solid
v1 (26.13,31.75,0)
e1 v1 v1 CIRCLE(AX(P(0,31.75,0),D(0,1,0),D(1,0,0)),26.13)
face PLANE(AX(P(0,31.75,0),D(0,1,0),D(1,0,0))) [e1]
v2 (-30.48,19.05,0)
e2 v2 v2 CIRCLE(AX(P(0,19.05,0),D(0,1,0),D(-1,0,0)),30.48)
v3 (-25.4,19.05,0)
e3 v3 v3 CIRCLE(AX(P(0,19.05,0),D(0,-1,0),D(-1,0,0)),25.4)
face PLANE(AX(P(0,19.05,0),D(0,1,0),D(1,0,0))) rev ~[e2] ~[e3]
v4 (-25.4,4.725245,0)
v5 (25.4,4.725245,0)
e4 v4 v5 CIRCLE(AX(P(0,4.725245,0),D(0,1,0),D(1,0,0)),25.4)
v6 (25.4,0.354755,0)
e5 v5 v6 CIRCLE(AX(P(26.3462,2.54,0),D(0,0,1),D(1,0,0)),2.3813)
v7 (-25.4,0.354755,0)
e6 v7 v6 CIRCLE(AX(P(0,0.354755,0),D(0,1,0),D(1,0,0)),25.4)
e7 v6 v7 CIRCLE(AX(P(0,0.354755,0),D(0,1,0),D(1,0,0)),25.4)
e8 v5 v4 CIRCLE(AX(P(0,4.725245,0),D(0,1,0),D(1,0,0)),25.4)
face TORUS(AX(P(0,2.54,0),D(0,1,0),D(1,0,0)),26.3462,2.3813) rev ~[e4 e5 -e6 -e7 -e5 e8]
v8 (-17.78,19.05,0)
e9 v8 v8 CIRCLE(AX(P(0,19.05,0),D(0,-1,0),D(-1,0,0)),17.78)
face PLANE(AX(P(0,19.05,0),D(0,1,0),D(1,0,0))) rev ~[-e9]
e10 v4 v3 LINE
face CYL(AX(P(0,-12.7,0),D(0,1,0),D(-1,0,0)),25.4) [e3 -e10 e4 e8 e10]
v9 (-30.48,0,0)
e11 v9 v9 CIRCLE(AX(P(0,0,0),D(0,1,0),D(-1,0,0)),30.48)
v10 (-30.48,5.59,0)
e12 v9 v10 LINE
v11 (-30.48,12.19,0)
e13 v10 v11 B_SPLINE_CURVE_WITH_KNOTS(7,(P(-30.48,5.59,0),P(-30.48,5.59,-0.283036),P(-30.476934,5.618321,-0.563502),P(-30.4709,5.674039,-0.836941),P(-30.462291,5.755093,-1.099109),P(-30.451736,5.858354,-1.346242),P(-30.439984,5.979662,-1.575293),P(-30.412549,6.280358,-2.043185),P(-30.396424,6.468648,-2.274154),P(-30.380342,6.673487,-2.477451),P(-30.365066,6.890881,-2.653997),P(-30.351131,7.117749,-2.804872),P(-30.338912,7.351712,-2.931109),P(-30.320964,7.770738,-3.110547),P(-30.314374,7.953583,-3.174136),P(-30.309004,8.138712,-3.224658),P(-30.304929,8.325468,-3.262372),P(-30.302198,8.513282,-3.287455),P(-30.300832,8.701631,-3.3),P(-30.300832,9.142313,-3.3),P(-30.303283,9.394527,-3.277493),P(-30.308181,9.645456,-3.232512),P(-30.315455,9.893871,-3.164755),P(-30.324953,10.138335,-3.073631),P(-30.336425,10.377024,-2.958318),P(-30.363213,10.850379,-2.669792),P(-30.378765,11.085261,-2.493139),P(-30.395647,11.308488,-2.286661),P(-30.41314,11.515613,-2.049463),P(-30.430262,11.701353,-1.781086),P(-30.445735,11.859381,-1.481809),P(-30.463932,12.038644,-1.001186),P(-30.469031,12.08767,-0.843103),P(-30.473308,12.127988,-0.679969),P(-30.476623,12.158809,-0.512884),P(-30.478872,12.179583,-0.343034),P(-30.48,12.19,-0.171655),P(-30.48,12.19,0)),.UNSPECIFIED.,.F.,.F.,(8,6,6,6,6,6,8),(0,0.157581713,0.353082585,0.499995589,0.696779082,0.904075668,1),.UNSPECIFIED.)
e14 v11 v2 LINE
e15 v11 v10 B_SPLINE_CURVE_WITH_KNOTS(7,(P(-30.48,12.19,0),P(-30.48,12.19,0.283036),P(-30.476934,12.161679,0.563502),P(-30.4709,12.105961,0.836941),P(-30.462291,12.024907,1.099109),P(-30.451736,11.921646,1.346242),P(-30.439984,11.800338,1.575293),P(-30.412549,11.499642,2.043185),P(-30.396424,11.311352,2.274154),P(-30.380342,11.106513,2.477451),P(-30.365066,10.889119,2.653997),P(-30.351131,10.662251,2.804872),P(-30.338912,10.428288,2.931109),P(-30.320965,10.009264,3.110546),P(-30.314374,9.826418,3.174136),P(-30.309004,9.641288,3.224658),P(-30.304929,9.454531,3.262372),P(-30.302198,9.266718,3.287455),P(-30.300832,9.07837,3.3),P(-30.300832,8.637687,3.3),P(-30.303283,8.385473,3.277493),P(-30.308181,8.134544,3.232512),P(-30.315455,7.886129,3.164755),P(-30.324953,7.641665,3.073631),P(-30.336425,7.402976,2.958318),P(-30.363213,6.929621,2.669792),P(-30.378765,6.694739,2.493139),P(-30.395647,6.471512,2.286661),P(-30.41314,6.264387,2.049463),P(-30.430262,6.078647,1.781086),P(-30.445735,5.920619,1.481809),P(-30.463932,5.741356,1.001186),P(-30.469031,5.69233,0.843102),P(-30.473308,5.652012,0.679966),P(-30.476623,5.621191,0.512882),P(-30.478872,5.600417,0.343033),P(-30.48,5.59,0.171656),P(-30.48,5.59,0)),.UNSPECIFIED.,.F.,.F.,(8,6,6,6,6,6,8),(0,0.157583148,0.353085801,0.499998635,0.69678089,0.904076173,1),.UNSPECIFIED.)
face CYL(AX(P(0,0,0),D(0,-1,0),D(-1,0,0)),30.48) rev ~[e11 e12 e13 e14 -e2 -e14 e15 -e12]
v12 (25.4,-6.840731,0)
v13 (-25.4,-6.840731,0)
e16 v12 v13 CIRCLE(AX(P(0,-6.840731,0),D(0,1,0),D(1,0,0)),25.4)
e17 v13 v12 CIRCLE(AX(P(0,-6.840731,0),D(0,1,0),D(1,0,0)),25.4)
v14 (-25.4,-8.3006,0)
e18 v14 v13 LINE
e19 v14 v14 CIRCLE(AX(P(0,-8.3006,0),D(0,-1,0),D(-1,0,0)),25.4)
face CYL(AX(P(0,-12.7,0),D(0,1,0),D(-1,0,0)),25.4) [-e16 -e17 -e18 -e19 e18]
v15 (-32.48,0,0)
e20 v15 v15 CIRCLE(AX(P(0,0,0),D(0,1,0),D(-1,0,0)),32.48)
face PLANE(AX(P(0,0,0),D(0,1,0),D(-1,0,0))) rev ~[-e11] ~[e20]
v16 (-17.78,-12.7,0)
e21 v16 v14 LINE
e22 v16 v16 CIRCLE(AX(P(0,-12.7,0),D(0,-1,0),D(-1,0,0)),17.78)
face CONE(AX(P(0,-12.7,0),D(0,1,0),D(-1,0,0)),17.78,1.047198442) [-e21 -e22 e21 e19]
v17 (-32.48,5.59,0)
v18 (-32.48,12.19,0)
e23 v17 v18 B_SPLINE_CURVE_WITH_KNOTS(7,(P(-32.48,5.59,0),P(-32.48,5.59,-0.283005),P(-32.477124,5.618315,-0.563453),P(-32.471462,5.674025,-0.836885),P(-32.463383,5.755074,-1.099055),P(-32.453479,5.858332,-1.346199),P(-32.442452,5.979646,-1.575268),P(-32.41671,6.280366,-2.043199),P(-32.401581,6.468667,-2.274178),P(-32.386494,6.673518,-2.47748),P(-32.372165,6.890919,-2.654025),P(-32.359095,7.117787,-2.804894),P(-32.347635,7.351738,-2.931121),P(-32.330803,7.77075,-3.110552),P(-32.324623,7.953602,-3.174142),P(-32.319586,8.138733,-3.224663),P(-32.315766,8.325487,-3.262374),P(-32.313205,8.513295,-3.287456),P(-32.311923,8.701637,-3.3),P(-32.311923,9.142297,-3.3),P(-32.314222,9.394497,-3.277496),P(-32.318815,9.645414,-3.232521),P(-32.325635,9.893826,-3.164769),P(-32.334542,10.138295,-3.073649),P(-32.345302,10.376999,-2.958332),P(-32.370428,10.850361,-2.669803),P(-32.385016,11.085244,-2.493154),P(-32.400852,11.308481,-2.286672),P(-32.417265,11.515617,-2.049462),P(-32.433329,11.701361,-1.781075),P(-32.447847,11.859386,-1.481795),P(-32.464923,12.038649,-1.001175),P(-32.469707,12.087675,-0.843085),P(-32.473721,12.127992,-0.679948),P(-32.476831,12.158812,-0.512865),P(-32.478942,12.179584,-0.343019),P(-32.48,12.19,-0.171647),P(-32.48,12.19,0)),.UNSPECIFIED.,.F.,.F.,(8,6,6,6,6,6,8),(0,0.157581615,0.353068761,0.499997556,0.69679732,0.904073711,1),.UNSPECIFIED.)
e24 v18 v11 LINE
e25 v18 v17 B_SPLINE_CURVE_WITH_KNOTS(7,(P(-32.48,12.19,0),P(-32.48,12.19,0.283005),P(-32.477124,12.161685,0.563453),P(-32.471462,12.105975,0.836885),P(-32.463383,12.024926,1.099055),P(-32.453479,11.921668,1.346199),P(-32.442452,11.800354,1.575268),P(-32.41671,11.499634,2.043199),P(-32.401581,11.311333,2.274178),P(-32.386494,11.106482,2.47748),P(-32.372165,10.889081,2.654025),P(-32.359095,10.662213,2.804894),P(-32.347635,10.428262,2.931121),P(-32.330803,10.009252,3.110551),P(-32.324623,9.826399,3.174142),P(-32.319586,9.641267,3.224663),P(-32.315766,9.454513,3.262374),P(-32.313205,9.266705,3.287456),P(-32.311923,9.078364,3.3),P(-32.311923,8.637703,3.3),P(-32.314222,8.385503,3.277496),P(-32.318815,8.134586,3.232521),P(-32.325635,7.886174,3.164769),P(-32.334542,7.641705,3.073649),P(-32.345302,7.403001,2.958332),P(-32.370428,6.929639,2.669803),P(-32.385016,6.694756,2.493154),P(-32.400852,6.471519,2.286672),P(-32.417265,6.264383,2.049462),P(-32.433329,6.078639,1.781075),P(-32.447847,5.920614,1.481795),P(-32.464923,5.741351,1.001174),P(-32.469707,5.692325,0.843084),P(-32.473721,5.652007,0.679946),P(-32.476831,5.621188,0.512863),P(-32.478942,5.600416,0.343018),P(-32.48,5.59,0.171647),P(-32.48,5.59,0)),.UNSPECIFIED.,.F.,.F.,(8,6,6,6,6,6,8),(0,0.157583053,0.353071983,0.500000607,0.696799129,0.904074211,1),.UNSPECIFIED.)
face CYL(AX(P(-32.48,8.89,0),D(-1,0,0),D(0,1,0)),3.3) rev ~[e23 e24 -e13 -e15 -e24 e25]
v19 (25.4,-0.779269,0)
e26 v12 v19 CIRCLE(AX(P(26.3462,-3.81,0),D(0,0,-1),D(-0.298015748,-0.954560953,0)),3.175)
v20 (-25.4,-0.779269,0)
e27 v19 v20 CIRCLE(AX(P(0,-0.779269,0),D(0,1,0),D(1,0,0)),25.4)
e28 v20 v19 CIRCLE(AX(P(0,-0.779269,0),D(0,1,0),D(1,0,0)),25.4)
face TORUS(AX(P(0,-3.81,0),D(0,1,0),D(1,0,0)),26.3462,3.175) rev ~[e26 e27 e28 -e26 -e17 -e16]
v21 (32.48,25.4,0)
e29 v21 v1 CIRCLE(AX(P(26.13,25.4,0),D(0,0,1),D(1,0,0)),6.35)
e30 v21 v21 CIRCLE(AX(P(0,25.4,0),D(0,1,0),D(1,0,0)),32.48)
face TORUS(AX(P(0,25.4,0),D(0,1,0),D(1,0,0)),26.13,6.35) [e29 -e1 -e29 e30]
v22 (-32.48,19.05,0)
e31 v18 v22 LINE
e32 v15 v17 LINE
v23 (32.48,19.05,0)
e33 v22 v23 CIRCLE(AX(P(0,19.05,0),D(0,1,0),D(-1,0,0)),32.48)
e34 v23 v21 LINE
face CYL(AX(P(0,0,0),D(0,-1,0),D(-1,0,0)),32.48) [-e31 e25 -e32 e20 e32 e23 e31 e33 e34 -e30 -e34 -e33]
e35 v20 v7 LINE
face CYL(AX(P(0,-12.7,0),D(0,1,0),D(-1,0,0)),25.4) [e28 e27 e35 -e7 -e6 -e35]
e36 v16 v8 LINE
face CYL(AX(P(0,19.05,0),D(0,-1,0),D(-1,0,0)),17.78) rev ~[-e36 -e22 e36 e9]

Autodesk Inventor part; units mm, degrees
ref_plane "XZ Plane" through (0, 0, 0) normal (0, 1, 0) x (-1, 0, 0)
sketch "Sketch1" plane through (0, 0, 0) normal (0, 1, 0) x (-1, 0, 0)
  circle A0 centre (0, 0) radius 30.48
  circle A1 centre (0, 0) radius 32.48
  dimension "d0" = 60.96
  dimension "d2" = 2
extrude "Extrusion1" add sketch "Sketch1" along normal blind 19.05
sketch "Sketch2" plane through (0, 19.05, 0) normal (0, 1, 0) x (1, 0, 0)
  circle A0 centre (0, 0) radius 32.48
  circle A1 centre (0, 0) radius 32.48 projected
extrude "Extrusion2" add sketch "Sketch2" along normal blind 12.7
fillet "Fillet1" radius 6.35 1 edges at (-32.48, 31.75, 0)
sketch "Sketch10" plane through (0, 0, 0) normal (0, 0, 1) x (1, 0, 0)
  line L0 (-17.78, 19.05) -> (-17.78, -12.7)
  line L1 (-17.78, -12.7) -> (-25.4, -12.7)
  line L2 (-25.4, -12.7) -> (-25.4, 19.05)
  line L3 (-17.78, 19.05) -> (-25.4, 19.05)
  line L4 (-26.13, 31.75) -> (26.13, 31.75) projected
  line L5 (0, 31.75) -> (0, 0)
  line L6 (32.48, 0) -> (-32.48, 0) projected
  line L7 (-30.48, 0) -> (-30.48, 19.05)
  line L8 (-17.78, -12.7) -> (-25.4, -8.3006)
  line L9 (-30.48, 19.05) -> (30.48, 19.05) projected
  point P0 (-30.48, 0)
  point P1 (-25.4, 19.05)
  dimension "d29" = 7.62
  dimension "d33" = 30
  dimension "d42" = 25.4
  dimension "d89" = 31.75
revolve "Revolution2" add sketch "Sketch10" angle 360 about axis through (0, 31.75, 0) along (0, -1, 0) contours L0 L6 L2 L3 | L0 L8 L2 L6
sketch "Sketch11" plane through (0, 0, 0) normal (0, 0, 1) x (1, 0, 0)
  line L0 (25.4, -7.0306) -> (25.4, 25.4)
  circle A0 centre (26.3462, -3.81) radius 3.175
  circle A1 centre (26.3462, 2.54) radius 2.3813
  line L1 (0, -11.43) -> (0, 31.75)
  line L2 (-26.13, 31.75) -> (26.13, 31.75) projected
  line L3 (26.3462, 2.54) -> (26.3462, -3.81)
  line L4 (30.48, 19.05) -> (30.48, 0) projected
  line L5 (30.48, 0) -> (29.972, 19.05)
  line L6 (29.972, 19.05) -> (29.972, 0) projected
  line L7 (-25.4, -5.08) -> (25.4, -5.08) projected
  line L8 (-17.78, -12.7) -> (17.78, -12.7) projected
  point P0 (0, 0)
  point P1 (25.4, -8.3006)
  point P2 (27.772, -0.6806)
  point P3 (17.78, -12.7)
  dimension "d36" = 6.35
  dimension "d37" = 4.7625
  dimension "d38" = 6.35
  dimension "d43" = 26.3462
  dimension "d91" = 8.89
revolve "Revolution3" cut sketch "Sketch11" angle 360 about axis through (0, -11.43, 0) along (0, 1, 0) contours A0 L7 L0 | L0 A0 | L7 A0 L0 | A1 L0 | L0 A1
ref_plane "Work Plane4" through (-32.48, 0, 0) normal (1, 0, 0) x (0, 1, 0)
sketch "Sketch24" plane through (-32.48, 0, 0) normal (1, 0, 0) x (0, 1, 0)
  circle A0 centre (8.89, 0) radius 3.3
  line L0 (0, -32.48) -> (0, 32.48) projected
  line L1 (31.75, 5) -> (31.75, -5) projected
  line L2 (31.75, 0) -> (0, 0) construction
  line L3 (-0.7793, -25.4) -> (-0.7793, 25.4) projected
  dimension "d106" = 6.6
  dimension "d107" = 8.89
  dimension "d108" = 0
extrude "Extrusion16" cut sketch "Sketch24" along normal up to surface
ref_plane "Work Plane5" through (30.48, 0, 0) normal (1, 0, 0) x (0, 1, 0)
properties part number "Water_Sensor_Cap_3DPrint"
